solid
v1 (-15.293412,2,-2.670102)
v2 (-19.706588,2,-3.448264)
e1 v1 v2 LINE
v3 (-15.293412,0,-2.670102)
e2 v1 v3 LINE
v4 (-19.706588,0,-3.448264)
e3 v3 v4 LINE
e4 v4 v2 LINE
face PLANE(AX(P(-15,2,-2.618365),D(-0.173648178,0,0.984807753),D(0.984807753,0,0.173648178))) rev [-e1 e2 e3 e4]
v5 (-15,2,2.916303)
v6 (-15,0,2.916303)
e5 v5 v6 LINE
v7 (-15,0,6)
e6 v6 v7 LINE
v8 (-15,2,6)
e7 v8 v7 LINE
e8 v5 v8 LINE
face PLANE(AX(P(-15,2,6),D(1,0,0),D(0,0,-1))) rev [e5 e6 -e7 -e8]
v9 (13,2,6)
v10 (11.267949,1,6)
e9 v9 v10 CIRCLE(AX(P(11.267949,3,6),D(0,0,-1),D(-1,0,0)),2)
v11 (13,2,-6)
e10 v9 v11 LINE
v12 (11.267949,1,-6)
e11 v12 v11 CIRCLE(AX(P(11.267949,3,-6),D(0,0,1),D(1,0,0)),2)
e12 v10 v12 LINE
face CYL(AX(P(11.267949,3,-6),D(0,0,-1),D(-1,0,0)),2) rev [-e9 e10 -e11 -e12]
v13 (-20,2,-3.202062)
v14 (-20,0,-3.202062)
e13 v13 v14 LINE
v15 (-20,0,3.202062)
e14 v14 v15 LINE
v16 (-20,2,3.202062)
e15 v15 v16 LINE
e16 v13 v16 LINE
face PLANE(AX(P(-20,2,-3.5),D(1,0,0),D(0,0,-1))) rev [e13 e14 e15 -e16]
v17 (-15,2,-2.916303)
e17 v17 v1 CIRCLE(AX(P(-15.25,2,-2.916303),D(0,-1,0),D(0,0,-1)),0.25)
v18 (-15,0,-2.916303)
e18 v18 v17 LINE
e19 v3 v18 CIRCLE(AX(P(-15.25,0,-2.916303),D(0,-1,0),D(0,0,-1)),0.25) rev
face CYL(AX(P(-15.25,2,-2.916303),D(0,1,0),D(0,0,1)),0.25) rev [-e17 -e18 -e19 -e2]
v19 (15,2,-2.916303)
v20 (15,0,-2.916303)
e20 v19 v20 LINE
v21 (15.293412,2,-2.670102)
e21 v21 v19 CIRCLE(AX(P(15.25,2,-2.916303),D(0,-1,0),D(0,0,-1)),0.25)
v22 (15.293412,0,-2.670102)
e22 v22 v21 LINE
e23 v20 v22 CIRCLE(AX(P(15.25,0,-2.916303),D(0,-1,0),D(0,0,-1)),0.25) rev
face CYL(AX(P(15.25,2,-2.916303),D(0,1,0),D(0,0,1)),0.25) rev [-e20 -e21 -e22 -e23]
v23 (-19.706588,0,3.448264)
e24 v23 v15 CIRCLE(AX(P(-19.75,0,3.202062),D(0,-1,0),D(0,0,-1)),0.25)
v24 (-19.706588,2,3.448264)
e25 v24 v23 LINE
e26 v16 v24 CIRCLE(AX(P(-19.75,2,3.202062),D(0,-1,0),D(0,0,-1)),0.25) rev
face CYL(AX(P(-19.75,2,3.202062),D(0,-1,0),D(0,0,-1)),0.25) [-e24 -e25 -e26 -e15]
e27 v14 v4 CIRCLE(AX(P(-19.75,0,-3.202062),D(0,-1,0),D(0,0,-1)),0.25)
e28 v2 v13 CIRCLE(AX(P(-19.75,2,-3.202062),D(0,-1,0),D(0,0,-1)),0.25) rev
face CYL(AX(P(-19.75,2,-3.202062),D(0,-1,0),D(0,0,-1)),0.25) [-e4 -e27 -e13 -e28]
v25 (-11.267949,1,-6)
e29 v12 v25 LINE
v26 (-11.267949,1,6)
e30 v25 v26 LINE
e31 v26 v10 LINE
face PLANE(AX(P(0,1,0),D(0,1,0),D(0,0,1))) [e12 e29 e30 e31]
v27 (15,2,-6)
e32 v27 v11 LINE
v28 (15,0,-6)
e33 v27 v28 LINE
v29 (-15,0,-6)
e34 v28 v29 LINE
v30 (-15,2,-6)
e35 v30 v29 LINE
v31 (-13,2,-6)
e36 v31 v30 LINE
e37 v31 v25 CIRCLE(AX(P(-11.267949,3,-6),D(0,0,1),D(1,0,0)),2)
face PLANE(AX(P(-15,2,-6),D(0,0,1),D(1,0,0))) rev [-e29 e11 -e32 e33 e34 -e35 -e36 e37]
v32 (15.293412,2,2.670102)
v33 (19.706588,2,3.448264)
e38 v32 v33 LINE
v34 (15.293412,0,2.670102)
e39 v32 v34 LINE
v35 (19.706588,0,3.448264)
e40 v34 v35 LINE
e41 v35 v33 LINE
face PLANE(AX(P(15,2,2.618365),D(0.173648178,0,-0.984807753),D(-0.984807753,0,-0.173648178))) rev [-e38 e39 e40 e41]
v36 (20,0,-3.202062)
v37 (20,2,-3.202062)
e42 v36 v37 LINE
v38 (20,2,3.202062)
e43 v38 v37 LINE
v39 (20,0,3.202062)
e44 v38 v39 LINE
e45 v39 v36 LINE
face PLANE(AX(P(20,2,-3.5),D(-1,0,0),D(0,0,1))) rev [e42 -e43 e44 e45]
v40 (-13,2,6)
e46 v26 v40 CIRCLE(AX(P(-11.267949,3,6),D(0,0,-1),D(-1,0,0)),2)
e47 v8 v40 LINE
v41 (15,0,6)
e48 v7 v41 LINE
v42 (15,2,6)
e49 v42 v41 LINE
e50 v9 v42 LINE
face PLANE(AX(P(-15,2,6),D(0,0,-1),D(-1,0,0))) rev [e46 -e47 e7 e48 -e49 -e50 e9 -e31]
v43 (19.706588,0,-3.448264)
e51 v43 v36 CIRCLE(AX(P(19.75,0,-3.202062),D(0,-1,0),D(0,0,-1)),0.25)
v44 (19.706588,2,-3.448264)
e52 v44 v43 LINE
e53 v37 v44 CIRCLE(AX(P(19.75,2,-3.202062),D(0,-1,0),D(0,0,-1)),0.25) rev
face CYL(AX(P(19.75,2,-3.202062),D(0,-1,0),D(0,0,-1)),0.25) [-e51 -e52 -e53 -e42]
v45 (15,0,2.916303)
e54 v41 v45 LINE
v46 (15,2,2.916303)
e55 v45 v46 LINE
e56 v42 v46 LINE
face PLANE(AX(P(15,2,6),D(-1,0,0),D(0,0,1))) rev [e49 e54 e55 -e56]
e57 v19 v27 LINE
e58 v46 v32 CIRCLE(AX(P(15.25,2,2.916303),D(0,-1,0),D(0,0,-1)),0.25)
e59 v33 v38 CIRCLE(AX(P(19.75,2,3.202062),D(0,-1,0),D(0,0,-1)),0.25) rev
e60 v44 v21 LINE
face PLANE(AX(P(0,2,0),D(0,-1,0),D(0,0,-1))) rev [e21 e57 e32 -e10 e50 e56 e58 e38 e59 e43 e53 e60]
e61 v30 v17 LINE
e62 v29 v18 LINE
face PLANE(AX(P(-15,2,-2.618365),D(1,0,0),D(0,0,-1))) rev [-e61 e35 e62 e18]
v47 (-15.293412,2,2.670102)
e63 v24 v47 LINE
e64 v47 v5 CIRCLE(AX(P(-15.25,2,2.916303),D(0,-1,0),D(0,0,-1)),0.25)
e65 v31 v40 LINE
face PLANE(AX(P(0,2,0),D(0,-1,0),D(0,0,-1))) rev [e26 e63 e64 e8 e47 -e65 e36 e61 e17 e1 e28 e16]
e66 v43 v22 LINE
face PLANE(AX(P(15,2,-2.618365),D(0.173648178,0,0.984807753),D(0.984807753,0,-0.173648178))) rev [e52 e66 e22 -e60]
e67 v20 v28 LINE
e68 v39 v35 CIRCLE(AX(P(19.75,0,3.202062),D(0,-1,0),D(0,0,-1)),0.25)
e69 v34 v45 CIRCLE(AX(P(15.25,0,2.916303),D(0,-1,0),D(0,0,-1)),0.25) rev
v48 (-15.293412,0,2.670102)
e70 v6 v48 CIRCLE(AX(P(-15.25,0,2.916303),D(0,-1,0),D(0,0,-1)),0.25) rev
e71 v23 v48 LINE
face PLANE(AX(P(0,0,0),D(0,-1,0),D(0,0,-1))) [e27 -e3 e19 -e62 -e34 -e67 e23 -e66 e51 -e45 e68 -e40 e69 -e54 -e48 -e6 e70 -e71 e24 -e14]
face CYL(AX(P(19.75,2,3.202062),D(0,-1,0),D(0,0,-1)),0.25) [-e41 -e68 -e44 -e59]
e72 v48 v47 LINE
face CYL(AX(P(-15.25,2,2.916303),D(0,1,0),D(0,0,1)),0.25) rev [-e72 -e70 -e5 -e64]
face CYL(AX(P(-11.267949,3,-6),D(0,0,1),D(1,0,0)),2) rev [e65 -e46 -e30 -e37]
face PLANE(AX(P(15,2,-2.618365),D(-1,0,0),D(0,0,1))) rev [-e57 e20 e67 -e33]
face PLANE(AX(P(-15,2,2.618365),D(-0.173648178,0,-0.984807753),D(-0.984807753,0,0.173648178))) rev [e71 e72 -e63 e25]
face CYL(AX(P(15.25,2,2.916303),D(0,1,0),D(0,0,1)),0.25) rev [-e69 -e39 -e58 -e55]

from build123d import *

# Parameters (mm, degrees)
BOSS_EXTRUDE1_DEPTH = 2
FILLET1_R           = 0.25
SKETCH3_W           = 26
SKETCH3_H           = 12
CUT_EXTRUDE2_DEPTH  = 1
FILLET6_R           = 2


with BuildPart() as part:
    # Sketch1 → Boss-Extrude1 (new body)
    with BuildSketch(Plane(origin=(0, 0, 0), x_dir=(1, 0, 0), z_dir=(0, 1, 0))):
        Polygon((-15, 2.618365096), (-20, 3.5), (-20, -3.5), (-15, -2.618365096), (-15, -6), (15, -6), (15, -2.618365096), (20, -3.5), (20, 3.5), (15, 2.618365096), (15, 6), (-15, 6), align=None)
    extrude(amount=BOSS_EXTRUDE1_DEPTH)

    # Fillet1
    fillet1_edges = [part.edges().sort_by_distance(p)[0] for p in [
        (15, 1, -2.618365096),
        (20, 1, -3.5),
        (20, 1, 3.5),
        (15, 1, 2.618365096),
        (-15, 1, 2.618365096),
        (-20, 1, 3.5),
        (-20, 1, -3.5),
        (-15, 1, -2.618365096),
    ]]
    fillet(fillet1_edges, radius=FILLET1_R)

    # Sketch3 → Cut-Extrude2 (cut)
    with BuildSketch(Plane(origin=(0, 2, 0), x_dir=(1, 0, 0), z_dir=(0, 1, 0))):
        Rectangle(SKETCH3_W, SKETCH3_H)
    extrude(amount=-CUT_EXTRUDE2_DEPTH, mode=Mode.SUBTRACT)

    # Fillet6
    # the kernel refuses this fillet: 2 mm, written as the material it adds along each edge
    with BuildSketch(Plane(origin=(-13, 1, 6), x_dir=(0, 1, 0), z_dir=(0, 0, -1))) as fillet6_piece_1:
        with BuildLine():
            CenterArc((2, 1.732050808), FILLET6_R, 180, 60)
            Line((0, 1.732050808), (-0.04, 1.732050808))
            Line((-0.04, 1.732050808), (-0.04, 0))
            Line((-0.04, 0), (0, -0.04))
            ThreePointArc((0, -0.04), (0.5, -0.04), (0.98, -0.034641016))
            Line((0.98, -0.034641016), (1, 0))
        make_face()
    extrude(amount=12)
    with BuildSketch(Plane(origin=(13, 1, -6), x_dir=(-1, 0, 0), z_dir=(0, 0, 1))) as fillet6_piece_2:
        with BuildLine():
            CenterArc((1.732050808, -2), FILLET6_R, 90, 60)
            Line((0, -1), (-0.034641016, -0.98))
            ThreePointArc((-0.034641016, -0.98), (-0.04, -0.5), (-0.04, 0))
            Line((-0.04, 0), (0, 0.04))
            Line((0, 0.04), (1.732050808, 0.04))
            Line((1.732050808, 0.04), (1.732050808, 0))
        make_face()
    extrude(amount=12)


solid = part.part
